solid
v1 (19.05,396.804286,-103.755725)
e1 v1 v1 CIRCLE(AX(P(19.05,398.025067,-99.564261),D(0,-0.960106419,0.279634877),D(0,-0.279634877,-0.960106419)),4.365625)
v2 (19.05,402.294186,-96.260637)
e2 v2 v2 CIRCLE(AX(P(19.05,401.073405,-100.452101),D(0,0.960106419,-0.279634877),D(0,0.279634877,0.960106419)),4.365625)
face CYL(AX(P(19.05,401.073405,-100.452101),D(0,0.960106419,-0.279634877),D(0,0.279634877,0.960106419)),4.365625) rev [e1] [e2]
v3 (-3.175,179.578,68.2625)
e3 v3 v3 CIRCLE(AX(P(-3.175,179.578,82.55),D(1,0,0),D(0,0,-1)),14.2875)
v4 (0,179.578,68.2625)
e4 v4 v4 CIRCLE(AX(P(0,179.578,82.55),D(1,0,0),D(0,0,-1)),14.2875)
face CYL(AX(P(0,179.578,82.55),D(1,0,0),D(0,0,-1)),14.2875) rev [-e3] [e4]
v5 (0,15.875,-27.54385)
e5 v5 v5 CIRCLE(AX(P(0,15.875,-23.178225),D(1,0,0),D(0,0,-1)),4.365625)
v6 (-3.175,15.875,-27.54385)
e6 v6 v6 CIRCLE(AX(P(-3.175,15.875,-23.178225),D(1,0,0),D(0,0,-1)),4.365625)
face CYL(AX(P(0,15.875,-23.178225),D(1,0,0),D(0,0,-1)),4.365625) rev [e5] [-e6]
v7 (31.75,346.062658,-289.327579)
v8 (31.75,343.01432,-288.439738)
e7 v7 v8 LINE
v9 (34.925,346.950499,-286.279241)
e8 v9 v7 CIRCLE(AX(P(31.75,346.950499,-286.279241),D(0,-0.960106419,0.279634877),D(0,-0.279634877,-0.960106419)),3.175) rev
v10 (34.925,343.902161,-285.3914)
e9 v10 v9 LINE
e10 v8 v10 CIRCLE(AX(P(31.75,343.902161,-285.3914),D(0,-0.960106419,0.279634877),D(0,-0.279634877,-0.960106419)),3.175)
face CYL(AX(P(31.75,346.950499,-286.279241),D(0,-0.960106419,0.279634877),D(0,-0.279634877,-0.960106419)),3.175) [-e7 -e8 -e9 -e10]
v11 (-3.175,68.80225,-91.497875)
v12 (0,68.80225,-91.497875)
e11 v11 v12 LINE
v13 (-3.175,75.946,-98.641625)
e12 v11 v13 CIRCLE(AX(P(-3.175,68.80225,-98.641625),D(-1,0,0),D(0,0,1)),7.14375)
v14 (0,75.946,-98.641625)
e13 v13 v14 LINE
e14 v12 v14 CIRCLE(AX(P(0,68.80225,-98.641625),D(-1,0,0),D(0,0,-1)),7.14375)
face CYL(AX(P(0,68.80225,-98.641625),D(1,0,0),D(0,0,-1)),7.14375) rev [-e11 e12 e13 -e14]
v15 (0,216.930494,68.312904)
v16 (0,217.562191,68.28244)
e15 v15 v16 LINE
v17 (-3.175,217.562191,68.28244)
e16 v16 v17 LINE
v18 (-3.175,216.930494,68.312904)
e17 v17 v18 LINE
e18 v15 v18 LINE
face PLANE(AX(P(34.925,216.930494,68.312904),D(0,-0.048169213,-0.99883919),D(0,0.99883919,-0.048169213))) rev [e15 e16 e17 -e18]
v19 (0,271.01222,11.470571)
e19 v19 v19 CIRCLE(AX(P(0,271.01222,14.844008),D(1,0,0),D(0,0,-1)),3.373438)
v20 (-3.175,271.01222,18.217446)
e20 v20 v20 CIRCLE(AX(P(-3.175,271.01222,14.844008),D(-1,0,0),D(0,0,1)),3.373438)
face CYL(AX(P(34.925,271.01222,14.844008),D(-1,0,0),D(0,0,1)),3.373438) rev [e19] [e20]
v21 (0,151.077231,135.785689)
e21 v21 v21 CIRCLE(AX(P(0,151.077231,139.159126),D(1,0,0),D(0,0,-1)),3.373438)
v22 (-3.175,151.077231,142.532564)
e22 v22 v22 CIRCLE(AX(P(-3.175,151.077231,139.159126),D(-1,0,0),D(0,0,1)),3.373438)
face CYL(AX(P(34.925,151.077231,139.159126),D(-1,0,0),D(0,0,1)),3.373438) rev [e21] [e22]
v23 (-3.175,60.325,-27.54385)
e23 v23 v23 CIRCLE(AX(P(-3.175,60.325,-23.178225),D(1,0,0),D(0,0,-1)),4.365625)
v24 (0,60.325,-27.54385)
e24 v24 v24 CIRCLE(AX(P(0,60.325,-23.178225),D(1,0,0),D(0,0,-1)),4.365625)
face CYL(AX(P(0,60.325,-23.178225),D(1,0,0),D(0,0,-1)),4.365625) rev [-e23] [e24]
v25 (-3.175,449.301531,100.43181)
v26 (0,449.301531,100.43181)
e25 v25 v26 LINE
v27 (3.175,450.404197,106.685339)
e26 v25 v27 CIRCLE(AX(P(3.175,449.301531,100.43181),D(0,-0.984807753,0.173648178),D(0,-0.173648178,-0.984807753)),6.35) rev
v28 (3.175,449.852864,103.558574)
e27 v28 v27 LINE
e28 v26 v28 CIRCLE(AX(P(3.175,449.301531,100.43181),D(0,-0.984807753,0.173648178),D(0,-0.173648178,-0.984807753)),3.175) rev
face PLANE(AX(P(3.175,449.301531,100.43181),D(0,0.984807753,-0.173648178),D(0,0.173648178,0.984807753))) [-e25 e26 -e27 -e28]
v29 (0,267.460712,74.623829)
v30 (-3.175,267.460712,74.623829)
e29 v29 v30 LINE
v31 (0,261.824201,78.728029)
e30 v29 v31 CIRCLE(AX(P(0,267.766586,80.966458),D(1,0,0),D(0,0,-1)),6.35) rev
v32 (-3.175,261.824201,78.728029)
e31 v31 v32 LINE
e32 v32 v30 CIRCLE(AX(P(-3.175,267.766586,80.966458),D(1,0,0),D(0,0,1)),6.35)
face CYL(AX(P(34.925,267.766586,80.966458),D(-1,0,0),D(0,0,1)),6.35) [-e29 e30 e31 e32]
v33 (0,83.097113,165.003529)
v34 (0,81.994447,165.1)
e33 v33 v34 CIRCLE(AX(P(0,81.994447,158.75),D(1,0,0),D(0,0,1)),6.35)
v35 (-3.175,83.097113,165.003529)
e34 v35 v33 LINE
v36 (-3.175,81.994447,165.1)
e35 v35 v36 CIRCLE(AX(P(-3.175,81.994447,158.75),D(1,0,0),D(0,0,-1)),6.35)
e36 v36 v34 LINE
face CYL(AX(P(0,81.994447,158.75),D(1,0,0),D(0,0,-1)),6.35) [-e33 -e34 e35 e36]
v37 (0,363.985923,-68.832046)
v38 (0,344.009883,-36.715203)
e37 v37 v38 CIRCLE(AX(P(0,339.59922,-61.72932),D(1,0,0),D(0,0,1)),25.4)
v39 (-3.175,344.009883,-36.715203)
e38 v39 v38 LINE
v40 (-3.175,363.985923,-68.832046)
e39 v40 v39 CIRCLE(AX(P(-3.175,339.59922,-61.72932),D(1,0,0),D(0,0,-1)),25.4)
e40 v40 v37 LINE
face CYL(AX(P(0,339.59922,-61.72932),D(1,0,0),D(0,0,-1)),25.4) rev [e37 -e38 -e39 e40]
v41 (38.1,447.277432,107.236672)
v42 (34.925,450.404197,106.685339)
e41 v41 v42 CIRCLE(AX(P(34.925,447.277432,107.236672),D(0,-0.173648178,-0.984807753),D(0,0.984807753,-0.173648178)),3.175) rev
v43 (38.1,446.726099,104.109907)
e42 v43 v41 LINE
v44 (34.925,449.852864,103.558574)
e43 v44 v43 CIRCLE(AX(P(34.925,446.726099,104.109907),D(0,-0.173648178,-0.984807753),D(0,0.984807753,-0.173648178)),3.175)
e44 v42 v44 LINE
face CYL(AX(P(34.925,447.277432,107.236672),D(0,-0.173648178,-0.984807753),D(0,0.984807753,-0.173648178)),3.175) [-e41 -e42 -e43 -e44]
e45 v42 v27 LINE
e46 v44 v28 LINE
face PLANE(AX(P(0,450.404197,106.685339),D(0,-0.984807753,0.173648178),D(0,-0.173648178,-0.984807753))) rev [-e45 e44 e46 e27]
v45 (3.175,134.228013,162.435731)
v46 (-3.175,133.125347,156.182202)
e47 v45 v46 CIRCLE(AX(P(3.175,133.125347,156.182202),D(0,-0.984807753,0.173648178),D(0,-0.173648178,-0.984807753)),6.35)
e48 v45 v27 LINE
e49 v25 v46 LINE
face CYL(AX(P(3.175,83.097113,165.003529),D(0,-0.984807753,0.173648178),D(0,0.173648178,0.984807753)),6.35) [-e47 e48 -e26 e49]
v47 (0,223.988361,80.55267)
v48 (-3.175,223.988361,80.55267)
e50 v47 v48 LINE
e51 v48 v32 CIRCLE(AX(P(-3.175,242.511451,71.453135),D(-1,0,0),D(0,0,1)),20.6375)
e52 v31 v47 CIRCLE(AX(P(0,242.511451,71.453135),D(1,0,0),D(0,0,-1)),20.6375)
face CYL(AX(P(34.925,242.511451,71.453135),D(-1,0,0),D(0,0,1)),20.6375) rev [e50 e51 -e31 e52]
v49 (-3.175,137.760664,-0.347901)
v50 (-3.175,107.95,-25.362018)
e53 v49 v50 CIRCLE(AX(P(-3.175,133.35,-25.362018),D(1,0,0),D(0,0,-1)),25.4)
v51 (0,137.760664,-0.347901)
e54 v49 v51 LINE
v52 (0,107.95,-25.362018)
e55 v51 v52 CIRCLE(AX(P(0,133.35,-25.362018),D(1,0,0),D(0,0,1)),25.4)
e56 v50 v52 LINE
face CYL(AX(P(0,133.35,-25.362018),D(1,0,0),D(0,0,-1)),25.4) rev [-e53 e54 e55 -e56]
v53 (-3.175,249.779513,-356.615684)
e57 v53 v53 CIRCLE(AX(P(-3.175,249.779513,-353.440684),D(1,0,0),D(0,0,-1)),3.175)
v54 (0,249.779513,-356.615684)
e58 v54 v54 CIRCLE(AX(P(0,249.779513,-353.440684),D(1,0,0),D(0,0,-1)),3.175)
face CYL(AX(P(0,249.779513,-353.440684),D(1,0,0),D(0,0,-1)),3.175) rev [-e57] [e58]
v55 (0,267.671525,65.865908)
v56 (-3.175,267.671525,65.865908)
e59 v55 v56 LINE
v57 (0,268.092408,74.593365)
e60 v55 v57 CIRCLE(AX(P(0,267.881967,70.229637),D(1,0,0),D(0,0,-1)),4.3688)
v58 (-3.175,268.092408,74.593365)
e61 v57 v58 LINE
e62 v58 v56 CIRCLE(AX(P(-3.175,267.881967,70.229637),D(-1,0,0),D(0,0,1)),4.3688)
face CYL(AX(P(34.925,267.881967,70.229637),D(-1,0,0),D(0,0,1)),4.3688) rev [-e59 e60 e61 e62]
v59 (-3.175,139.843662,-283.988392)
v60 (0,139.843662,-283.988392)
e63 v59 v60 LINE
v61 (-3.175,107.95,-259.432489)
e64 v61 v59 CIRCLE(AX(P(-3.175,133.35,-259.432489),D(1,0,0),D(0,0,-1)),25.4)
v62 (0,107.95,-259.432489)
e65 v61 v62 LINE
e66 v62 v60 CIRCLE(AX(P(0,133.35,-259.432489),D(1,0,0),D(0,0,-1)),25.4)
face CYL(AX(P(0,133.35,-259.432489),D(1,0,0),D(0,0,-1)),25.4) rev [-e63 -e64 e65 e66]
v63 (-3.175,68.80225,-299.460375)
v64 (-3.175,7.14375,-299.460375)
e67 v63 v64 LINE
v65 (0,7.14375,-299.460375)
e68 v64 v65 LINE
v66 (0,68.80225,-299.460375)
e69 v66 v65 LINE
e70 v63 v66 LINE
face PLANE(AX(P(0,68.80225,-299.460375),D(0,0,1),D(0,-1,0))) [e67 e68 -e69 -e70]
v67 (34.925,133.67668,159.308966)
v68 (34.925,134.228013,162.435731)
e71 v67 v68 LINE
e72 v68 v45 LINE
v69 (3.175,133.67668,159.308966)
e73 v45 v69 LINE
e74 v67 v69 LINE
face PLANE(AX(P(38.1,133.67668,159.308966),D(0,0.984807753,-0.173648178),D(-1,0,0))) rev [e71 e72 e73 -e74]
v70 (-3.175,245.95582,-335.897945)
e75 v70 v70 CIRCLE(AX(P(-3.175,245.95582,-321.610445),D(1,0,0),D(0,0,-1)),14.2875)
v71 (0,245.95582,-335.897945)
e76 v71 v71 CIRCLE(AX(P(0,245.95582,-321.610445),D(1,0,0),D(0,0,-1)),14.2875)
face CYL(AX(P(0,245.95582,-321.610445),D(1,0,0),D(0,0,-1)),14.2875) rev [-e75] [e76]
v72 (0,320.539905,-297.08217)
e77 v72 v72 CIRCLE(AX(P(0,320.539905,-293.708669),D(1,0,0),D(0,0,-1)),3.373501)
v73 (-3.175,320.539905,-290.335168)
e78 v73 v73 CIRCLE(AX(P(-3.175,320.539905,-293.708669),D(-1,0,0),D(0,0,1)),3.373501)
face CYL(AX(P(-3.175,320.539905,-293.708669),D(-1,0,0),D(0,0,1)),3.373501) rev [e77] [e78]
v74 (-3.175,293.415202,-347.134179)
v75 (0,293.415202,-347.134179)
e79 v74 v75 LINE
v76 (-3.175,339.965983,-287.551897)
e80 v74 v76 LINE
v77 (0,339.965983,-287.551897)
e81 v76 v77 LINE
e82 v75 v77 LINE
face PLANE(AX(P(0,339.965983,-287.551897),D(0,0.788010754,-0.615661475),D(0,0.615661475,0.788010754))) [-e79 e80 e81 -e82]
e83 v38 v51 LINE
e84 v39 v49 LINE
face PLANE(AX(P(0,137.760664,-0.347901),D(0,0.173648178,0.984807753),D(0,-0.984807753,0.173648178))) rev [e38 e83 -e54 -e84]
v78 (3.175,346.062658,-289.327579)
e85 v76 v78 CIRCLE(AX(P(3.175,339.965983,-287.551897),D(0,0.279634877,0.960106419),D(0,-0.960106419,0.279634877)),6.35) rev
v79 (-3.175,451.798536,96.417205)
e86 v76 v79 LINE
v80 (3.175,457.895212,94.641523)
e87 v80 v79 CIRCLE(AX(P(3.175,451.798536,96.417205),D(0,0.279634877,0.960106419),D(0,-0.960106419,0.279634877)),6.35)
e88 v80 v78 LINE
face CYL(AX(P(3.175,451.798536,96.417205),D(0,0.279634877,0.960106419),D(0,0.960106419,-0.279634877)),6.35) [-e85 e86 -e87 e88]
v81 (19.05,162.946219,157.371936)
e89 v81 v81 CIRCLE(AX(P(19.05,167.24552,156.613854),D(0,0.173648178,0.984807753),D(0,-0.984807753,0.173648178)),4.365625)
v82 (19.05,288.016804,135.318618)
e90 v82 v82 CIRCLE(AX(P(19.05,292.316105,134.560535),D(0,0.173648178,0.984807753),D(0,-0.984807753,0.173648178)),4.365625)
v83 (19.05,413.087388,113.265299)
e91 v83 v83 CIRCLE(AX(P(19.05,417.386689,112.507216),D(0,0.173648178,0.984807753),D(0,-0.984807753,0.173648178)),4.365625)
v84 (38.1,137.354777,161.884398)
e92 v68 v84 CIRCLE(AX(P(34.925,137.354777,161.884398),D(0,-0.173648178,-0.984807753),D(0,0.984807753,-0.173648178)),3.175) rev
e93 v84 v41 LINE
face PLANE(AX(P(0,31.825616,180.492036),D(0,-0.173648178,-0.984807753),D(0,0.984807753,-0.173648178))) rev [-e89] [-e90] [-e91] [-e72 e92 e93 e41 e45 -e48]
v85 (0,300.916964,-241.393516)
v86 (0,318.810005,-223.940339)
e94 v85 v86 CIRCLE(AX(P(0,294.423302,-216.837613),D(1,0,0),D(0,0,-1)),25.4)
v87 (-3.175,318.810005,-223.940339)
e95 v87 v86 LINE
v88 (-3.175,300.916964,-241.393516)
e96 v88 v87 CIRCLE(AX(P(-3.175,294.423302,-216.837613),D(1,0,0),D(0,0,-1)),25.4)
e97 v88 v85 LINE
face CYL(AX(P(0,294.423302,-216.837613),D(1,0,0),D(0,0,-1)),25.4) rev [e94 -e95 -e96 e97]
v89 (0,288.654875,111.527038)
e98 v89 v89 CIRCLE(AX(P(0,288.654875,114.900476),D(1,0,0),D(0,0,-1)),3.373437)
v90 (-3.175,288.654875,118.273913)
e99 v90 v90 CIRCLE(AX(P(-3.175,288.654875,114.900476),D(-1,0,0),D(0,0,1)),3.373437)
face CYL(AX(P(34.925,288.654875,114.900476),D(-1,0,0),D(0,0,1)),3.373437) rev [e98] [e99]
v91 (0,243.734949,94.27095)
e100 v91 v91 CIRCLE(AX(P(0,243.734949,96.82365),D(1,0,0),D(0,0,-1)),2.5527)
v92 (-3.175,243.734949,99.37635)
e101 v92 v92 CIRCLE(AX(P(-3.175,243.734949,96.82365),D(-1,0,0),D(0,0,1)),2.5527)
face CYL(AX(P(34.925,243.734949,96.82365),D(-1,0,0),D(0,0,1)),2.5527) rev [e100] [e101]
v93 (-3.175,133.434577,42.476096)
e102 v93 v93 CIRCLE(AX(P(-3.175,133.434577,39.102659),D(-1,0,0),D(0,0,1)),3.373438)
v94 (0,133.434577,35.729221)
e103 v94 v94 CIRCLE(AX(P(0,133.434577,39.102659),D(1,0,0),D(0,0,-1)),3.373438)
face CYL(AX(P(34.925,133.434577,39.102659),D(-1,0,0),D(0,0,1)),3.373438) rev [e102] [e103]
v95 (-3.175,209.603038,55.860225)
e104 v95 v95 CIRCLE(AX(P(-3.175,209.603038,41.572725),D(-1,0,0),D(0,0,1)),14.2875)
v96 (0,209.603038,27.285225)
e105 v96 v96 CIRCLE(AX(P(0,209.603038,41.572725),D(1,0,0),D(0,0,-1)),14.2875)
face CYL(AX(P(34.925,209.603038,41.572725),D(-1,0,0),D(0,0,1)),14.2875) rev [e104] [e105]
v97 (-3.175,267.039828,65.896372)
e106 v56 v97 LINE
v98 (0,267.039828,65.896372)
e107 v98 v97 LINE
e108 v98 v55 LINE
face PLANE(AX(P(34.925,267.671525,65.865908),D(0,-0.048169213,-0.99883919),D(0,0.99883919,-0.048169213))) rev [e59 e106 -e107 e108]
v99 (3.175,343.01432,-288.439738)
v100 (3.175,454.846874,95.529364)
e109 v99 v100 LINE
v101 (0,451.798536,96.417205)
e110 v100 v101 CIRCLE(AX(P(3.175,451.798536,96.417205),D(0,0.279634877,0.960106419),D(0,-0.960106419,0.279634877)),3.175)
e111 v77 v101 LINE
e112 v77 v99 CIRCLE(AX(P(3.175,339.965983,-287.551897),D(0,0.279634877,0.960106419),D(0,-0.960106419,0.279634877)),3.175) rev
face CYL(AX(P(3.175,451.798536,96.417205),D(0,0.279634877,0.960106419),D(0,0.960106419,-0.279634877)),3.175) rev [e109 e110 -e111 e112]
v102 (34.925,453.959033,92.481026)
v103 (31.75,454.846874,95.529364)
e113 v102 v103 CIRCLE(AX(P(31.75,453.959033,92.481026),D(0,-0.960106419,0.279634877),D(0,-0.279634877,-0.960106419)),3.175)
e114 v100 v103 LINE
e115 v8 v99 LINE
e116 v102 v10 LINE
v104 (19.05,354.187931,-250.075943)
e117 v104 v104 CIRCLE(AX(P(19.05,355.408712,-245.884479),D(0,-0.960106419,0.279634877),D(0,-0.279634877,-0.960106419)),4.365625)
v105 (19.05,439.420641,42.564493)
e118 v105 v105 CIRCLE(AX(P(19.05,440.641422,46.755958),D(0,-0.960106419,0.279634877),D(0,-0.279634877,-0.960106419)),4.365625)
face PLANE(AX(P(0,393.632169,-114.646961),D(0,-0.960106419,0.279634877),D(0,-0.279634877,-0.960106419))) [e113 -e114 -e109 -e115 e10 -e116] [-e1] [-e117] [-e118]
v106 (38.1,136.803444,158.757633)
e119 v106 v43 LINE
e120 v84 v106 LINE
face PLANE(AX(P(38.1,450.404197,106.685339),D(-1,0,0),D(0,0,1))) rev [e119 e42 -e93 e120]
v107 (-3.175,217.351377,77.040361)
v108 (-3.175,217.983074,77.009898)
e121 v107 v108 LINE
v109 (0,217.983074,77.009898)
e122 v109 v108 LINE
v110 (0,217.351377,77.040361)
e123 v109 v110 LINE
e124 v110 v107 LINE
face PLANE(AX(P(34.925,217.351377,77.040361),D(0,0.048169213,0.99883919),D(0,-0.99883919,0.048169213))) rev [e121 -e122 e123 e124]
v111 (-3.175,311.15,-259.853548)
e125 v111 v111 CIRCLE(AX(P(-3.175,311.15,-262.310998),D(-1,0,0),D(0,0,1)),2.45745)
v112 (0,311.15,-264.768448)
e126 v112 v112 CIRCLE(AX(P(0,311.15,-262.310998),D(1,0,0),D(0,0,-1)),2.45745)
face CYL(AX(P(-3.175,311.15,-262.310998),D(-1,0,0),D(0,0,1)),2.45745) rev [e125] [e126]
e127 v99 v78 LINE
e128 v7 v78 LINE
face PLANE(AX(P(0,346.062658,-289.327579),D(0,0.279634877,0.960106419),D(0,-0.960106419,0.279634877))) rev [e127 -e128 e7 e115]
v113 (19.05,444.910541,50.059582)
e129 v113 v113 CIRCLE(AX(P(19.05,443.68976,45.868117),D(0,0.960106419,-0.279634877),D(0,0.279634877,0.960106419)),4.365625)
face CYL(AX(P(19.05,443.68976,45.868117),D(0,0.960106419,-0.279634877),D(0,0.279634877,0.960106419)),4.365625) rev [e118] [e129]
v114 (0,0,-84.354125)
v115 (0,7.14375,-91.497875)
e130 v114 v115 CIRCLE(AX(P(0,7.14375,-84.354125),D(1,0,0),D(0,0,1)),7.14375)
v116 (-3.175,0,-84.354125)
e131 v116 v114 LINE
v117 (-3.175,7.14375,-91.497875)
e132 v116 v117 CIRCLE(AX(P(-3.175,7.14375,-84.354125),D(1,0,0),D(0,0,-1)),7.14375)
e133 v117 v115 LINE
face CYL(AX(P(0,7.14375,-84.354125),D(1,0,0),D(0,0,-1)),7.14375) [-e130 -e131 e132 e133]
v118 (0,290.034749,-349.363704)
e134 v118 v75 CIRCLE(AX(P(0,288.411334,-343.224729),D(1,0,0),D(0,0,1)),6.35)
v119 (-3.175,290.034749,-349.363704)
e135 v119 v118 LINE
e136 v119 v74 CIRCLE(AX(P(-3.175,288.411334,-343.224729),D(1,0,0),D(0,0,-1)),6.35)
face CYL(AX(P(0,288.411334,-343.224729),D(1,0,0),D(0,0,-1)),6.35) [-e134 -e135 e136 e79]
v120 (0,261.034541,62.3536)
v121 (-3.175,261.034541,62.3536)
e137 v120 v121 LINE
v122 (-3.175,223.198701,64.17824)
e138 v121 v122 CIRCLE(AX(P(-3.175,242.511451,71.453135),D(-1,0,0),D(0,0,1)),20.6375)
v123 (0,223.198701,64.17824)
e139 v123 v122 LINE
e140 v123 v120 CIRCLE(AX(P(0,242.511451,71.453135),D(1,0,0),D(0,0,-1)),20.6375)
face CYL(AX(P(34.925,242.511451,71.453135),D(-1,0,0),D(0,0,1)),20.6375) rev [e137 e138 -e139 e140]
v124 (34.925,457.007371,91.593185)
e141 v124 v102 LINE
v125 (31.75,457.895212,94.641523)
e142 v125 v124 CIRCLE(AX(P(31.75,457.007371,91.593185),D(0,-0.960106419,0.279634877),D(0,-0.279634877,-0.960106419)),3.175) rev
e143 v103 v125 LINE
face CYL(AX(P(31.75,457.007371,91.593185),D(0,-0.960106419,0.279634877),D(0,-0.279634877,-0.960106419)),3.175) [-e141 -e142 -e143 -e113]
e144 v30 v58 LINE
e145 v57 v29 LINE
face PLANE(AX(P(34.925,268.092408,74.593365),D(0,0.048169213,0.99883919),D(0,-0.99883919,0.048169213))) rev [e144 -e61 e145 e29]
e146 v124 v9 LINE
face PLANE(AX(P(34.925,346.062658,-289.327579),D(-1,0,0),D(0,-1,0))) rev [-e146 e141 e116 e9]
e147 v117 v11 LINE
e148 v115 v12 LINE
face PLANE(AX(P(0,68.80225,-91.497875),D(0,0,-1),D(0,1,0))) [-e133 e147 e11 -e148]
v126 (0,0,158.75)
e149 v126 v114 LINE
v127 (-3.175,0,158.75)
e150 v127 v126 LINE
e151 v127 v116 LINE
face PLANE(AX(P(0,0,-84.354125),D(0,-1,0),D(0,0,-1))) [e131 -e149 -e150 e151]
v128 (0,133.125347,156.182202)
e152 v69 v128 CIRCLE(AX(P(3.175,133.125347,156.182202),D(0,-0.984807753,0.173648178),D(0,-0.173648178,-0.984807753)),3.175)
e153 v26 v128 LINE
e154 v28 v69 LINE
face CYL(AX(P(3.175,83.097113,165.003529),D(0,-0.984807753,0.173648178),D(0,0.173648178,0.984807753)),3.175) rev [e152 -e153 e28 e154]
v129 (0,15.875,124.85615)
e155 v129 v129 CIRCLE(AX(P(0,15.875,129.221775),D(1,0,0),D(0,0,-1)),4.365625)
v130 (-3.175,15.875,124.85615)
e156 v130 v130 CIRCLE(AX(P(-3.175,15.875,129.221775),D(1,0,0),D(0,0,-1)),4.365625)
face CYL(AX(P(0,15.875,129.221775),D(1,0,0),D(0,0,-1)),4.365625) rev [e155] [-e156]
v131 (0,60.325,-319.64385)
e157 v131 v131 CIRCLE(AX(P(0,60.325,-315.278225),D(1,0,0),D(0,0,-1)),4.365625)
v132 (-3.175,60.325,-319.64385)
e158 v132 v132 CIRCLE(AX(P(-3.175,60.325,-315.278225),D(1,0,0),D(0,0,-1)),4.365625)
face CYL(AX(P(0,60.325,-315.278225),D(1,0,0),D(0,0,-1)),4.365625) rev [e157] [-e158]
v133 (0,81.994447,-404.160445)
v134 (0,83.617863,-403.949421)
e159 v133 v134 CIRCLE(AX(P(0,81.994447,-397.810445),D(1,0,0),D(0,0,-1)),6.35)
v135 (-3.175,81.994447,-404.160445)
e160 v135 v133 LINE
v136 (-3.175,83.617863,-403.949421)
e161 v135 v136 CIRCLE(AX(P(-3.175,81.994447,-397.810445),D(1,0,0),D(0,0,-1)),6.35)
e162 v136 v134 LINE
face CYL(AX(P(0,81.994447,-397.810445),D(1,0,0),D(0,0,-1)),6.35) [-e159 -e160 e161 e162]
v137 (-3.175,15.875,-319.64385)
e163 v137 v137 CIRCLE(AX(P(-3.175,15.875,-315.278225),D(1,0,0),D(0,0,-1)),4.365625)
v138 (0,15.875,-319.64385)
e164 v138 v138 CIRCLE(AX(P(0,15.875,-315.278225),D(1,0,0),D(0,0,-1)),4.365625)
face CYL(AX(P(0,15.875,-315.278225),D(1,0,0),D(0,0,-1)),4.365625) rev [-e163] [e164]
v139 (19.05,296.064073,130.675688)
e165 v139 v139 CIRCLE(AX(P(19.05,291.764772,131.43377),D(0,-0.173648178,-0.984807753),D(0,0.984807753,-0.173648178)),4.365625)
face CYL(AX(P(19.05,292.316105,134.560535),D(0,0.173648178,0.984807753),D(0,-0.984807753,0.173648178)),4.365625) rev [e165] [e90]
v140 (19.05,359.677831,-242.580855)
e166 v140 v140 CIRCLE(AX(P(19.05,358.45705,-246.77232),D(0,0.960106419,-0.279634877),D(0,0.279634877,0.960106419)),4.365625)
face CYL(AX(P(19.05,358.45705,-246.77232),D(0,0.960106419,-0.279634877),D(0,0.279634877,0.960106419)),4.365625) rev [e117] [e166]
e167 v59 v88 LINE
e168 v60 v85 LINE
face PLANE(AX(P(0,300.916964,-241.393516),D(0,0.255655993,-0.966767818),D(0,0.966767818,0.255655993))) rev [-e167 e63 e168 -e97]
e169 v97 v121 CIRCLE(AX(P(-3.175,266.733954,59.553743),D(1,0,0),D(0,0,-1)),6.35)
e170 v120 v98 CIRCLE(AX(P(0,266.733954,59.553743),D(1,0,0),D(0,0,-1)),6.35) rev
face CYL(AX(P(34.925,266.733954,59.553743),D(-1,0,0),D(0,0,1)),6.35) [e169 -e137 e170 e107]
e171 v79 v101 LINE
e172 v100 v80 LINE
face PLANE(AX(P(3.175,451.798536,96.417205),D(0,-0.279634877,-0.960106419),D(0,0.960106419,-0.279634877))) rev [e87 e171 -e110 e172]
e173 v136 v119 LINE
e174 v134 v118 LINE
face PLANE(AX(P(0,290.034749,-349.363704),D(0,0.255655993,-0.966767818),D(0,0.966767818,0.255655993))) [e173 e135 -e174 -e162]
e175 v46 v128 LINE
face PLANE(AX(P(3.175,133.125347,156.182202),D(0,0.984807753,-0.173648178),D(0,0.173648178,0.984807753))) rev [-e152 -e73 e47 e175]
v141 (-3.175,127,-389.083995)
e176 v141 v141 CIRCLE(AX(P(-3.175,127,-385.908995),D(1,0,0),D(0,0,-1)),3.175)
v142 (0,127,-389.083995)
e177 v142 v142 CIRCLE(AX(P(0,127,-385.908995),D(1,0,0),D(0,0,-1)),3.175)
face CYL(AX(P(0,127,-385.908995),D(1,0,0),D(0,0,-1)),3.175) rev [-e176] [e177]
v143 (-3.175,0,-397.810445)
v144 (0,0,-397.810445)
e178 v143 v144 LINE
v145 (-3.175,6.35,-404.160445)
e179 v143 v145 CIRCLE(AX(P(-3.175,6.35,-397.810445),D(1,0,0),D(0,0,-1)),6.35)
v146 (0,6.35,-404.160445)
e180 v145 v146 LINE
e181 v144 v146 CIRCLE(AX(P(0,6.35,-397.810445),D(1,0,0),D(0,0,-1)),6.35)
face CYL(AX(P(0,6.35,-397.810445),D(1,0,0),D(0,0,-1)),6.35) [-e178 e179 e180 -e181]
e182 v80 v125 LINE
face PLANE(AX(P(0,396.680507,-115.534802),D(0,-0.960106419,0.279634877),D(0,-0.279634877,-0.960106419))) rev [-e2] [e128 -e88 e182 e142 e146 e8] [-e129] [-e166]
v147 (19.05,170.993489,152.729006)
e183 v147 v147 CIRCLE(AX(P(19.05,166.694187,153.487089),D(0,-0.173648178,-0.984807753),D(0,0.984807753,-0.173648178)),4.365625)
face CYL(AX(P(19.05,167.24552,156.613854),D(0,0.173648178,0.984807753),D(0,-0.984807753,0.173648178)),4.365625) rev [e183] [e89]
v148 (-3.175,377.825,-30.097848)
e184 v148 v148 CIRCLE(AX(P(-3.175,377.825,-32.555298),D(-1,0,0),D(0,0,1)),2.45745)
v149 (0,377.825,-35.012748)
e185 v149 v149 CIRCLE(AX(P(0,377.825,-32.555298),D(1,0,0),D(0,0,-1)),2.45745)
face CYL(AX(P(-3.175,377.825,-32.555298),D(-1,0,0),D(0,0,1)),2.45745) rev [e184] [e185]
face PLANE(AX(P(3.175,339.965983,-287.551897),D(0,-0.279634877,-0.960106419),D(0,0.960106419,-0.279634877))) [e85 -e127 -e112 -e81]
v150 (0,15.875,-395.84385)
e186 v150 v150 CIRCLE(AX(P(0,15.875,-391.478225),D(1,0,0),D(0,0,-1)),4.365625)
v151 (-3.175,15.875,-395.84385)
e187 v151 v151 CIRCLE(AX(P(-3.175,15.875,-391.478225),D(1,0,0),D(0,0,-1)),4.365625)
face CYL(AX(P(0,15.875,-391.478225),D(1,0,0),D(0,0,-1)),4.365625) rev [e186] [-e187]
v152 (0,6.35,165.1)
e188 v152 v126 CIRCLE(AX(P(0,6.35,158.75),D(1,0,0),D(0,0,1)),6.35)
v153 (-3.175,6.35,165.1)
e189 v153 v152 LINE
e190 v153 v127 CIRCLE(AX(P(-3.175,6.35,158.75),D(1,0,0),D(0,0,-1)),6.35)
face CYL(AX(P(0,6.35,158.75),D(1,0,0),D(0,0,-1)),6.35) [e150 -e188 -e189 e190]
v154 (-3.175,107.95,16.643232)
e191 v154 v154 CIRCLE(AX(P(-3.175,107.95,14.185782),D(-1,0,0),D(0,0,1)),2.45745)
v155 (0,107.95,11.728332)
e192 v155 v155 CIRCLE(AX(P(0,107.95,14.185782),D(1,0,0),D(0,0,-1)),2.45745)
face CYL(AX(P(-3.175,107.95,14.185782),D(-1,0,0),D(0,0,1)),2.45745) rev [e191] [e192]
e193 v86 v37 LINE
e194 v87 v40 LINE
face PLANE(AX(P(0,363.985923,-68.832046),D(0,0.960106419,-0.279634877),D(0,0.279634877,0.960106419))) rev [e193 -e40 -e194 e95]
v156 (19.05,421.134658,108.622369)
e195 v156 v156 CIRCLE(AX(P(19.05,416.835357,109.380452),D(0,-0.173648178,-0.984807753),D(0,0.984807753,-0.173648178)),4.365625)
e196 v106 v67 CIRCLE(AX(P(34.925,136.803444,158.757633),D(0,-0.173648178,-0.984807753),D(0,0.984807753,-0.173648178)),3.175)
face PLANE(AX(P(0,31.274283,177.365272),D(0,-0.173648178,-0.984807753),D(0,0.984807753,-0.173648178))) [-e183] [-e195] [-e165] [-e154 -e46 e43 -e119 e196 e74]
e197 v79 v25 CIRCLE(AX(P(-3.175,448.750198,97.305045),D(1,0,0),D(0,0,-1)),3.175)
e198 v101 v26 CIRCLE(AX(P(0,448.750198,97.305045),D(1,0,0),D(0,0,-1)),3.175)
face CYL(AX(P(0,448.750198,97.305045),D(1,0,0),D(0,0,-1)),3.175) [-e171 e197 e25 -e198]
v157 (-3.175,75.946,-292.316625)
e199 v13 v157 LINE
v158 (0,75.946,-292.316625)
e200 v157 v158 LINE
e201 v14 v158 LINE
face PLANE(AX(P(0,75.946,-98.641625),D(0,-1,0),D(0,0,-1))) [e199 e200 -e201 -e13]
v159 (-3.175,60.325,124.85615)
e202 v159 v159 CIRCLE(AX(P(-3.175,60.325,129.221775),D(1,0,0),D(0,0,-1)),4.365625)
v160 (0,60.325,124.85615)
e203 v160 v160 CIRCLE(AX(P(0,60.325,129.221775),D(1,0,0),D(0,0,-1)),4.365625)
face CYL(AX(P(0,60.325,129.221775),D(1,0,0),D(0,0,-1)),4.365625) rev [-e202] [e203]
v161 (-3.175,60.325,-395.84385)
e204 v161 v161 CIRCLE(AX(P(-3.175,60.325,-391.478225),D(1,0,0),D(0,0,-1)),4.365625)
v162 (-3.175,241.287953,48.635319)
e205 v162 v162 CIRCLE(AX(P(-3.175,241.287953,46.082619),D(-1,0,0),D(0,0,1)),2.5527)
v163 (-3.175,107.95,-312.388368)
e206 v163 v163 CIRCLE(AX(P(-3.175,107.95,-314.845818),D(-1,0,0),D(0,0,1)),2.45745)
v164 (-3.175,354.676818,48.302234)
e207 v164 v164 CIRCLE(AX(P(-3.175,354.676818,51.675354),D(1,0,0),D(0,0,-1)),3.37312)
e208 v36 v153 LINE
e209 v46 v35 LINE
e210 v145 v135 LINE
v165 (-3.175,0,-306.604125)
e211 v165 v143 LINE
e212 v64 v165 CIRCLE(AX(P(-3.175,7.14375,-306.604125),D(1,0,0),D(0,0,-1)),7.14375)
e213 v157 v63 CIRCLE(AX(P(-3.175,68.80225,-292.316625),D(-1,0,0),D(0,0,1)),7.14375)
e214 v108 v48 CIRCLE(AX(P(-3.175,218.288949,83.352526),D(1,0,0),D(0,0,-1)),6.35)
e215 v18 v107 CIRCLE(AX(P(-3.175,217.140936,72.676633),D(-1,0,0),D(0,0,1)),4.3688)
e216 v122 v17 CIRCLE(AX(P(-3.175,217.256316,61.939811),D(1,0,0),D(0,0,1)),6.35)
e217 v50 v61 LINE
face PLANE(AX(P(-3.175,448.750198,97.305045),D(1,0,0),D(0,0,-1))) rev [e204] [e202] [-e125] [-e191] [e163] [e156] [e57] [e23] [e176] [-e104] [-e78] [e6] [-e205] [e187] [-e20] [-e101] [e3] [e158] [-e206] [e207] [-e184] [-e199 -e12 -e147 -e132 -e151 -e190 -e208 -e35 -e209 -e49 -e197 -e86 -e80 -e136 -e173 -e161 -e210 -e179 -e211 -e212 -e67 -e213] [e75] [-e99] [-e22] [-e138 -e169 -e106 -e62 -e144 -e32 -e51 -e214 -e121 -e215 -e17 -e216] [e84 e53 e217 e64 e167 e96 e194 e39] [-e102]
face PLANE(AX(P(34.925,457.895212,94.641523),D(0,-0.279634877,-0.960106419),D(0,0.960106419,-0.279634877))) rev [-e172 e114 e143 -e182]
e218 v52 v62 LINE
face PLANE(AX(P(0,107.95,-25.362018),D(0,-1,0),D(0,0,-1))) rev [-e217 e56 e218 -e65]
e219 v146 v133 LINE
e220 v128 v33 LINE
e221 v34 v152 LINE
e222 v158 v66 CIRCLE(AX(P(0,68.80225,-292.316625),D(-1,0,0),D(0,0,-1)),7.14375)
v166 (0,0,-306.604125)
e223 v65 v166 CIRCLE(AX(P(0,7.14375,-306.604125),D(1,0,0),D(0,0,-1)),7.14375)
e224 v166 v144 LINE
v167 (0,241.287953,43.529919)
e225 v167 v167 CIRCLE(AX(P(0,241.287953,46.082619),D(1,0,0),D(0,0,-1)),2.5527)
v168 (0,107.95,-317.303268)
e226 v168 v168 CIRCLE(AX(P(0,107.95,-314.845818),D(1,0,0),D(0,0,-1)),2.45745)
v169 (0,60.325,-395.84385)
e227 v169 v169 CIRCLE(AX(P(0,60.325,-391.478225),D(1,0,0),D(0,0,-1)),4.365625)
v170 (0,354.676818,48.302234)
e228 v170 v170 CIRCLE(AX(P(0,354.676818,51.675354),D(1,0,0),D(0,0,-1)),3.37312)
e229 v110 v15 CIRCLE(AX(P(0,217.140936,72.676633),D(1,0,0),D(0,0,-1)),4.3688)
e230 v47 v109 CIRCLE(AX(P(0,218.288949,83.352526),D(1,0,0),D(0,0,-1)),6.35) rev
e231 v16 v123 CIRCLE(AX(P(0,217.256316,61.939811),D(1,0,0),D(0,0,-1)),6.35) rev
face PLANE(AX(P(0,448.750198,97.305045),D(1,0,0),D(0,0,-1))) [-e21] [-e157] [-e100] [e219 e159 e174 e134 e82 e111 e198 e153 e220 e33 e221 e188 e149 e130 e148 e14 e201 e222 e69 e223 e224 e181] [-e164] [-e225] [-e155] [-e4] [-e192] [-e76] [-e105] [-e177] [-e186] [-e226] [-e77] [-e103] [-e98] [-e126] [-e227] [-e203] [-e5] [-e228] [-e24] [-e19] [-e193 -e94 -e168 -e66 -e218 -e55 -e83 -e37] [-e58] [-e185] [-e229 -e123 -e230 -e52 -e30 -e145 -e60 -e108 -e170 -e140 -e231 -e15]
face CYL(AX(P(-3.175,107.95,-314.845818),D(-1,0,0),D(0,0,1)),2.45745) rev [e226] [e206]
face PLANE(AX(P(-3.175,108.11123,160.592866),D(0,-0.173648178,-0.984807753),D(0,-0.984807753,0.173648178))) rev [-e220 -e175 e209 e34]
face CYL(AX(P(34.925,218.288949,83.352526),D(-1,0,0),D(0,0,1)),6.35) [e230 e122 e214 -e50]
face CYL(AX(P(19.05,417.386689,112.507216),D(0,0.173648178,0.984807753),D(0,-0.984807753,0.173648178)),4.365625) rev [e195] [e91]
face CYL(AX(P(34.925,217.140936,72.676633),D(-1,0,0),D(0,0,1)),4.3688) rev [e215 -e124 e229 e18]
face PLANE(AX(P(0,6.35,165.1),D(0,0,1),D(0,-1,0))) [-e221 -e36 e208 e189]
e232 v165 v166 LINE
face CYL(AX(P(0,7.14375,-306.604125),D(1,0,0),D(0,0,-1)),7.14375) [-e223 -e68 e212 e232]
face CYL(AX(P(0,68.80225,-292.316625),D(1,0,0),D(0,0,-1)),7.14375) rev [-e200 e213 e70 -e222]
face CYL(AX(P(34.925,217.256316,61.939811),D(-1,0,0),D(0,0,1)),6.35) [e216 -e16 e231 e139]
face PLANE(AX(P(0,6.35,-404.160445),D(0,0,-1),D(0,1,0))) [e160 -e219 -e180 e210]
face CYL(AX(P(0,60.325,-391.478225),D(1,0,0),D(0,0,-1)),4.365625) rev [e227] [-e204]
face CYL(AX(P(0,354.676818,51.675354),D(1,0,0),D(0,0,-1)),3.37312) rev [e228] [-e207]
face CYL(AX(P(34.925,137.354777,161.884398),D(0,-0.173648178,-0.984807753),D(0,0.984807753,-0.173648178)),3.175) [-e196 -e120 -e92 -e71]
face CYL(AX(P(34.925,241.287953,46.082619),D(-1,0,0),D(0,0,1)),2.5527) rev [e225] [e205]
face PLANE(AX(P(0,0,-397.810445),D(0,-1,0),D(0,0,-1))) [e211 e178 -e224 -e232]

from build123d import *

# Parameters (mm, degrees)
SKETCH1_R                            = 14.2875
SKETCH1_R_2                          = 3.37312
BOSS_EXTRUDE1_DEPTH                  = 3.175
EDGE_FLANGE1_DEPTH                   = 399.923481586
SKETCH5_R                            = 14.2875
SKETCH5_R_2                          = 3.37312
SKETCH5_R_3                          = 2.5527
SKETCH5_R_4                          = 3.3734375
CUT_EXTRUDE1_DEPTH                   = 612.935699735
EDGE_FLANGE2_DEPTH                   = 371.853711622
F_11_32_0_34375_DIAMETER_HOLE3_D     = 8.73125
F_1_4_0_25_DIAMETER_HOLE1_D          = 6.35
F_17_64_0_26563_DIAMETER_HOLE2_D     = 6.747002
F_11_32_0_34375_DIAMETER_HOLE1_D     = 8.73125
F_11_32_0_34375_DIAMETER_HOLE2_D     = 8.73125
F_11_32_0_34375_DIAMETER_HOLE2_DEPTH = 3.175
F_10_0_1935_DIAMETER_HOLE1_D         = 4.9149
CUT_EXTRUDE2_START                   = -50.8
CUT_EXTRUDE2_DEPTH                   = 50.8
FILLET1_R                            = 3.175


# Sheet-metal steps are written as plain solids
with BuildPart() as part:
    # Sketch1 → Boss-Extrude1 (new body)
    with BuildSketch(Plane(origin=(0, 0, 0), x_dir=(0, 0, -1), z_dir=(1, 0, 0))):
        with BuildLine():
            Line((397.810445414, 0), (306.604125414, 0))
            ThreePointArc((306.604125414, 0), (301.552731346, 2.092355932), (299.460375414, 7.14375))
            Line((299.460375414, 7.14375), (299.460375414, 68.80225))
            ThreePointArc((299.460375414, 68.80225), (297.368019482, 73.853644068), (292.316625414, 75.946))
            Line((292.316625414, 75.946), (98.641625414, 75.946))
            ThreePointArc((98.641625414, 75.946), (93.590231346, 73.853644068), (91.497875414, 68.80225))
            Line((91.497875414, 68.80225), (91.497875414, 7.14375))
            ThreePointArc((91.497875414, 7.14375), (89.405519482, 2.092355932), (84.354125414, 0))
            Line((84.354125414, 0), (-158.75, 0))
            ThreePointArc((-158.75, 0), (-163.240128061, 1.859871939), (-165.1, 6.35))
            Line((-165.1, 6.35), (-165.1, 81.994446987))
            ThreePointArc((-165.1, 81.994446987), (-165.075836333, 82.547885953), (-165.003529232, 83.097112915))
            Line((-165.003529232, 83.097112915), (-100.43180985, 449.301531106))
            ThreePointArc((-100.43180985, 449.301531106), (-98.981933252, 451.446245541), (-96.4172045, 451.798536022))
            Line((-96.4172045, 451.798536022), (287.551897257, 339.965982534))
            Line((287.551897257, 339.965982534), (347.134178996, 293.415202216))
            ThreePointArc((347.134178996, 293.415202216), (348.525632464, 291.907463008), (349.363704269, 290.034749489))
            Line((349.363704269, 290.034749489), (403.949421055, 83.617862545))
            ThreePointArc((403.949421055, 83.617862545), (404.107468334, 82.812983692), (404.160445414, 81.994446987))
            Line((404.160445414, 81.994446987), (404.160445414, 6.35))
            ThreePointArc((404.160445414, 6.35), (402.300573474, 1.859871939), (397.810445414, 0))
        make_face()
        with Locations((-82.55, 179.578)):
            Circle(SKETCH1_R, mode=Mode.SUBTRACT)
        with Locations((-51.675354011, 354.676818486)):
            Circle(SKETCH1_R_2, mode=Mode.SUBTRACT)
        with Locations((321.610445414, 245.95582)):
            Circle(SKETCH1_R, mode=Mode.SUBTRACT)
        with BuildLine():
            Line((25.362018074, 107.95), (259.432488996, 107.95))
            ThreePointArc((259.432488996, 107.95), (279.55833085, 117.854500987), (283.988391562, 139.843662232))
            Line((283.988391562, 139.843662232), (241.393515847, 300.916964234))
            ThreePointArc((241.393515847, 300.916964234), (235.020226293, 312.158932355), (223.940339151, 318.810005043))
            Line((223.940339151, 318.810005043), (68.8320461, 363.985922583))
            ThreePointArc((68.8320461, 363.985922583), (48.314216085, 361.16759873), (36.715203303, 344.009883255))
            Line((36.715203303, 344.009883255), (0.347901148, 137.760663713))
            ThreePointArc((0.347901148, 137.760663713), (5.904489219, 117.023194714), (25.362018074, 107.95))
        make_face(mode=Mode.SUBTRACT)
    extrude(amount=-BOSS_EXTRUDE1_DEPTH)

    # Edge-Flange1 section (across the edge) → Edge-Flange1 (add)
    with BuildSketch(Plane(origin=(0, 343.014320414, -288.439737991), x_dir=(3.4914813388431334e-15, -0.9601064189437505, 0.27963487676434007), z_dir=(0, 0.27963487676434007, 0.9601064189437505))):
        with BuildLine():
            Line((-3.175, 3.175), (-3.175, 34.925))
            Line((-3.175, 34.925), (0, 34.925))
            Line((0, 34.925), (0, 3.175))
            ThreePointArc((0, 3.175), (0.92993597, 0.92993597), (3.175, 0))
            Line((3.175, 0), (3.175, -3.175))
            ThreePointArc((3.175, -3.175), (-1.315128061, -1.315128061), (-3.175, 3.175))
        make_face()
    extrude(amount=EDGE_FLANGE1_DEPTH)

    # Sketch5 → Cut-Extrude1 (cut, through all)
    with BuildSketch(Plane.ZY.offset(3.175)):
        with Locations(Location((82.55, 179.578, 0), (0, 0, 180))):
            Circle(SKETCH5_R)
        with Locations(Location((51.675354011, 354.676818486, 0), (0, 0, 180))):
            Circle(SKETCH5_R_2)
        with Locations(Location((-321.610445414, 245.95582, 0), (0, 0, 180))):
            Circle(SKETCH5_R)
        with Locations((96.823649998, 243.734949129)):
            Circle(SKETCH5_R_3)
        with Locations((46.08261916, 241.287953106)):
            Circle(SKETCH5_R_3)
        with Locations((41.572725009, 209.603038456)):
            Circle(SKETCH5_R)
        with Locations((114.900475932, 288.654874532)):
            Circle(SKETCH5_R_4)
        with Locations((14.844008226, 271.012219681)):
            Circle(SKETCH5_R_4)
        with Locations((39.102658646, 133.434576585)):
            Circle(SKETCH5_R_4)
        with Locations((139.159126352, 151.077231436)):
            Circle(SKETCH5_R_4)
        with BuildLine():
            Line((65.865907916, 267.671524878), (65.896371611, 267.039828185))
            ThreePointArc((65.896371611, 267.039828185), (65.022940965, 263.507443035), (62.353599656, 261.034541314))
            ThreePointArc((62.353599656, 261.034541314), (50.839590801, 241.517358984), (64.178240374, 223.19870091))
            ThreePointArc((64.178240374, 223.19870091), (67.073153395, 220.994136431), (68.282440243, 217.562190734))
            Line((68.282440243, 217.562190734), (68.312903938, 216.930494041))
            ThreePointArc((68.312903938, 216.930494041), (72.887074248, 212.777207047), (77.040361242, 217.351377357))
            Line((77.040361242, 217.351377357), (77.009897547, 217.98307405))
            ThreePointArc((77.009897547, 217.98307405), (77.883328193, 221.5154592), (80.552669502, 223.988360921))
            ThreePointArc((80.552669502, 223.988360921), (92.066678357, 243.505543251), (78.728028784, 261.824201325))
            ThreePointArc((78.728028784, 261.824201325), (75.833115763, 264.028765804), (74.623828915, 267.460711501))
            Line((74.623828915, 267.460711501), (74.59336522, 268.092408194))
            ThreePointArc((74.59336522, 268.092408194), (70.01919491, 272.245695188), (65.865907916, 267.671524878))
        make_face()
    extrude(amount=-CUT_EXTRUDE1_DEPTH, mode=Mode.SUBTRACT)

    # Edge-Flange2 section (across the edge) → Edge-Flange2 (add)
    with BuildSketch(Plane(origin=(0, 449.85286407, 103.558574466), x_dir=(3.4914813388431334e-15, -0.17364817766692356, -0.9848077530122094), z_dir=(0, -0.9848077530122094, 0.17364817766692356))):
        with BuildLine():
            Line((-3.175, 3.175), (-3.175, 38.1))
            Line((-3.175, 38.1), (0, 38.1))
            Line((0, 38.1), (0, 3.175))
            ThreePointArc((0, 3.175), (0.92993597, 0.92993597), (3.175, 0))
            Line((3.175, 0), (3.175, -3.175))
            ThreePointArc((3.175, -3.175), (-1.315128061, -1.315128061), (-3.175, 3.175))
        make_face()
    extrude(amount=EDGE_FLANGE2_DEPTH)

    # 11/32 (0.34375) Diameter Hole3 (through all)
    with Locations(Plane(origin=(0, 0, 0), x_dir=(0, 0, -1), z_dir=(1, 0, 0))):
        with Locations((-129.221774586, 15.875), (-129.221774586, 60.325), (23.178225414, 15.875), (23.178225414, 60.325), (315.278225414, 60.325), (315.278225414, 15.875), (391.478225414, 15.875), (391.478225414, 60.325)):
            Hole(F_11_32_0_34375_DIAMETER_HOLE3_D / 2)

    # 1/4 (0.25) Diameter Hole1 (through all)
    with Locations(Plane(origin=(0, 0, 0), x_dir=(0, 0, -1), z_dir=(1, 0, 0))):
        with Locations((353.440683712, 249.779512828), (385.908994874, 127)):
            Hole(F_1_4_0_25_DIAMETER_HOLE1_D / 2)

    # 17/64 (0.26563) Diameter Hole2 (through all)
    with Locations(Plane.ZY.offset(3.175)):
        with Locations((-293.708669355, 320.539904842)):
            Hole(F_17_64_0_26563_DIAMETER_HOLE2_D / 2)

    # 11/32 (0.34375) Diameter Hole1 (through all)
    with Locations(Plane(origin=(0, 396.680507326, -115.53480176), x_dir=(1, 0, 0), z_dir=(-3.629989339958336e-15, 0.9601064189437505, -0.27963487676434007))):
        with Locations((19.05, 136.69059512), (19.05, -15.70940488), (19.05, -168.10940488)):
            Hole(F_11_32_0_34375_DIAMETER_HOLE1_D / 2)

    # 11/32 (0.34375) Diameter Hole2
    with Locations(Plane(origin=(0, 31.825615837, 180.492036493), x_dir=(1, 0, 0), z_dir=(-3.2076224383382817e-15, 0.17364817766692356, 0.9848077530122092))):
        with Locations((19.05, 391.508974703), (19.05, 264.508974703), (19.05, 137.508974703)):
            Hole(F_11_32_0_34375_DIAMETER_HOLE2_D / 2, depth=F_11_32_0_34375_DIAMETER_HOLE2_DEPTH)

    # #10 (0.1935) Diameter Hole1 (through all)
    with Locations(Plane.ZY.offset(3.175)):
        with Locations((-262.310998074, 311.15), (-314.845818074, 107.95), (14.185781926, 107.95), (-32.555298074, 377.825)):
            Hole(F_10_0_1935_DIAMETER_HOLE1_D / 2)

    # Sketch31 → Cut-Extrude2 (cut)
    with BuildSketch(Plane(origin=(0, 52.374163006, -9.23497803), x_dir=(1, 0, 0), z_dir=(-2.784783301719586e-15, -0.9848077530122092, 0.1736481776669235)).offset(CUT_EXTRUDE2_START)):
        with BuildLine():
            Line((3.175, 180.101417089), (38.1, 180.101417089))
            Line((38.1, 180.101417089), (38.1, 183.276417089))
            Line((38.1, 183.276417089), (3.175, 183.276417089))
            ThreePointArc((3.175, 183.276417089), (-1.315128061, 181.416545149), (-3.175, 176.926417089))
            Line((-3.175, 176.926417089), (0, 176.926417089))
            ThreePointArc((0, 176.926417089), (0.92993597, 179.171481119), (3.175, 180.101417089))
        make_face()
    extrude(amount=CUT_EXTRUDE2_DEPTH, mode=Mode.SUBTRACT)

    # Fillet1
    fillet1_edges = [part.edges().sort_by_distance(p)[0] for p in [
        (38.1, 450.128530552, 105.121956774),
        (38.1, 133.952346214, 160.87234873),
        (34.925, 344.538489354, -288.883658358),
        (34.925, 456.371042842, 95.0854434),
    ]]
    fillet(fillet1_edges, radius=FILLET1_R)


solid = part.part
